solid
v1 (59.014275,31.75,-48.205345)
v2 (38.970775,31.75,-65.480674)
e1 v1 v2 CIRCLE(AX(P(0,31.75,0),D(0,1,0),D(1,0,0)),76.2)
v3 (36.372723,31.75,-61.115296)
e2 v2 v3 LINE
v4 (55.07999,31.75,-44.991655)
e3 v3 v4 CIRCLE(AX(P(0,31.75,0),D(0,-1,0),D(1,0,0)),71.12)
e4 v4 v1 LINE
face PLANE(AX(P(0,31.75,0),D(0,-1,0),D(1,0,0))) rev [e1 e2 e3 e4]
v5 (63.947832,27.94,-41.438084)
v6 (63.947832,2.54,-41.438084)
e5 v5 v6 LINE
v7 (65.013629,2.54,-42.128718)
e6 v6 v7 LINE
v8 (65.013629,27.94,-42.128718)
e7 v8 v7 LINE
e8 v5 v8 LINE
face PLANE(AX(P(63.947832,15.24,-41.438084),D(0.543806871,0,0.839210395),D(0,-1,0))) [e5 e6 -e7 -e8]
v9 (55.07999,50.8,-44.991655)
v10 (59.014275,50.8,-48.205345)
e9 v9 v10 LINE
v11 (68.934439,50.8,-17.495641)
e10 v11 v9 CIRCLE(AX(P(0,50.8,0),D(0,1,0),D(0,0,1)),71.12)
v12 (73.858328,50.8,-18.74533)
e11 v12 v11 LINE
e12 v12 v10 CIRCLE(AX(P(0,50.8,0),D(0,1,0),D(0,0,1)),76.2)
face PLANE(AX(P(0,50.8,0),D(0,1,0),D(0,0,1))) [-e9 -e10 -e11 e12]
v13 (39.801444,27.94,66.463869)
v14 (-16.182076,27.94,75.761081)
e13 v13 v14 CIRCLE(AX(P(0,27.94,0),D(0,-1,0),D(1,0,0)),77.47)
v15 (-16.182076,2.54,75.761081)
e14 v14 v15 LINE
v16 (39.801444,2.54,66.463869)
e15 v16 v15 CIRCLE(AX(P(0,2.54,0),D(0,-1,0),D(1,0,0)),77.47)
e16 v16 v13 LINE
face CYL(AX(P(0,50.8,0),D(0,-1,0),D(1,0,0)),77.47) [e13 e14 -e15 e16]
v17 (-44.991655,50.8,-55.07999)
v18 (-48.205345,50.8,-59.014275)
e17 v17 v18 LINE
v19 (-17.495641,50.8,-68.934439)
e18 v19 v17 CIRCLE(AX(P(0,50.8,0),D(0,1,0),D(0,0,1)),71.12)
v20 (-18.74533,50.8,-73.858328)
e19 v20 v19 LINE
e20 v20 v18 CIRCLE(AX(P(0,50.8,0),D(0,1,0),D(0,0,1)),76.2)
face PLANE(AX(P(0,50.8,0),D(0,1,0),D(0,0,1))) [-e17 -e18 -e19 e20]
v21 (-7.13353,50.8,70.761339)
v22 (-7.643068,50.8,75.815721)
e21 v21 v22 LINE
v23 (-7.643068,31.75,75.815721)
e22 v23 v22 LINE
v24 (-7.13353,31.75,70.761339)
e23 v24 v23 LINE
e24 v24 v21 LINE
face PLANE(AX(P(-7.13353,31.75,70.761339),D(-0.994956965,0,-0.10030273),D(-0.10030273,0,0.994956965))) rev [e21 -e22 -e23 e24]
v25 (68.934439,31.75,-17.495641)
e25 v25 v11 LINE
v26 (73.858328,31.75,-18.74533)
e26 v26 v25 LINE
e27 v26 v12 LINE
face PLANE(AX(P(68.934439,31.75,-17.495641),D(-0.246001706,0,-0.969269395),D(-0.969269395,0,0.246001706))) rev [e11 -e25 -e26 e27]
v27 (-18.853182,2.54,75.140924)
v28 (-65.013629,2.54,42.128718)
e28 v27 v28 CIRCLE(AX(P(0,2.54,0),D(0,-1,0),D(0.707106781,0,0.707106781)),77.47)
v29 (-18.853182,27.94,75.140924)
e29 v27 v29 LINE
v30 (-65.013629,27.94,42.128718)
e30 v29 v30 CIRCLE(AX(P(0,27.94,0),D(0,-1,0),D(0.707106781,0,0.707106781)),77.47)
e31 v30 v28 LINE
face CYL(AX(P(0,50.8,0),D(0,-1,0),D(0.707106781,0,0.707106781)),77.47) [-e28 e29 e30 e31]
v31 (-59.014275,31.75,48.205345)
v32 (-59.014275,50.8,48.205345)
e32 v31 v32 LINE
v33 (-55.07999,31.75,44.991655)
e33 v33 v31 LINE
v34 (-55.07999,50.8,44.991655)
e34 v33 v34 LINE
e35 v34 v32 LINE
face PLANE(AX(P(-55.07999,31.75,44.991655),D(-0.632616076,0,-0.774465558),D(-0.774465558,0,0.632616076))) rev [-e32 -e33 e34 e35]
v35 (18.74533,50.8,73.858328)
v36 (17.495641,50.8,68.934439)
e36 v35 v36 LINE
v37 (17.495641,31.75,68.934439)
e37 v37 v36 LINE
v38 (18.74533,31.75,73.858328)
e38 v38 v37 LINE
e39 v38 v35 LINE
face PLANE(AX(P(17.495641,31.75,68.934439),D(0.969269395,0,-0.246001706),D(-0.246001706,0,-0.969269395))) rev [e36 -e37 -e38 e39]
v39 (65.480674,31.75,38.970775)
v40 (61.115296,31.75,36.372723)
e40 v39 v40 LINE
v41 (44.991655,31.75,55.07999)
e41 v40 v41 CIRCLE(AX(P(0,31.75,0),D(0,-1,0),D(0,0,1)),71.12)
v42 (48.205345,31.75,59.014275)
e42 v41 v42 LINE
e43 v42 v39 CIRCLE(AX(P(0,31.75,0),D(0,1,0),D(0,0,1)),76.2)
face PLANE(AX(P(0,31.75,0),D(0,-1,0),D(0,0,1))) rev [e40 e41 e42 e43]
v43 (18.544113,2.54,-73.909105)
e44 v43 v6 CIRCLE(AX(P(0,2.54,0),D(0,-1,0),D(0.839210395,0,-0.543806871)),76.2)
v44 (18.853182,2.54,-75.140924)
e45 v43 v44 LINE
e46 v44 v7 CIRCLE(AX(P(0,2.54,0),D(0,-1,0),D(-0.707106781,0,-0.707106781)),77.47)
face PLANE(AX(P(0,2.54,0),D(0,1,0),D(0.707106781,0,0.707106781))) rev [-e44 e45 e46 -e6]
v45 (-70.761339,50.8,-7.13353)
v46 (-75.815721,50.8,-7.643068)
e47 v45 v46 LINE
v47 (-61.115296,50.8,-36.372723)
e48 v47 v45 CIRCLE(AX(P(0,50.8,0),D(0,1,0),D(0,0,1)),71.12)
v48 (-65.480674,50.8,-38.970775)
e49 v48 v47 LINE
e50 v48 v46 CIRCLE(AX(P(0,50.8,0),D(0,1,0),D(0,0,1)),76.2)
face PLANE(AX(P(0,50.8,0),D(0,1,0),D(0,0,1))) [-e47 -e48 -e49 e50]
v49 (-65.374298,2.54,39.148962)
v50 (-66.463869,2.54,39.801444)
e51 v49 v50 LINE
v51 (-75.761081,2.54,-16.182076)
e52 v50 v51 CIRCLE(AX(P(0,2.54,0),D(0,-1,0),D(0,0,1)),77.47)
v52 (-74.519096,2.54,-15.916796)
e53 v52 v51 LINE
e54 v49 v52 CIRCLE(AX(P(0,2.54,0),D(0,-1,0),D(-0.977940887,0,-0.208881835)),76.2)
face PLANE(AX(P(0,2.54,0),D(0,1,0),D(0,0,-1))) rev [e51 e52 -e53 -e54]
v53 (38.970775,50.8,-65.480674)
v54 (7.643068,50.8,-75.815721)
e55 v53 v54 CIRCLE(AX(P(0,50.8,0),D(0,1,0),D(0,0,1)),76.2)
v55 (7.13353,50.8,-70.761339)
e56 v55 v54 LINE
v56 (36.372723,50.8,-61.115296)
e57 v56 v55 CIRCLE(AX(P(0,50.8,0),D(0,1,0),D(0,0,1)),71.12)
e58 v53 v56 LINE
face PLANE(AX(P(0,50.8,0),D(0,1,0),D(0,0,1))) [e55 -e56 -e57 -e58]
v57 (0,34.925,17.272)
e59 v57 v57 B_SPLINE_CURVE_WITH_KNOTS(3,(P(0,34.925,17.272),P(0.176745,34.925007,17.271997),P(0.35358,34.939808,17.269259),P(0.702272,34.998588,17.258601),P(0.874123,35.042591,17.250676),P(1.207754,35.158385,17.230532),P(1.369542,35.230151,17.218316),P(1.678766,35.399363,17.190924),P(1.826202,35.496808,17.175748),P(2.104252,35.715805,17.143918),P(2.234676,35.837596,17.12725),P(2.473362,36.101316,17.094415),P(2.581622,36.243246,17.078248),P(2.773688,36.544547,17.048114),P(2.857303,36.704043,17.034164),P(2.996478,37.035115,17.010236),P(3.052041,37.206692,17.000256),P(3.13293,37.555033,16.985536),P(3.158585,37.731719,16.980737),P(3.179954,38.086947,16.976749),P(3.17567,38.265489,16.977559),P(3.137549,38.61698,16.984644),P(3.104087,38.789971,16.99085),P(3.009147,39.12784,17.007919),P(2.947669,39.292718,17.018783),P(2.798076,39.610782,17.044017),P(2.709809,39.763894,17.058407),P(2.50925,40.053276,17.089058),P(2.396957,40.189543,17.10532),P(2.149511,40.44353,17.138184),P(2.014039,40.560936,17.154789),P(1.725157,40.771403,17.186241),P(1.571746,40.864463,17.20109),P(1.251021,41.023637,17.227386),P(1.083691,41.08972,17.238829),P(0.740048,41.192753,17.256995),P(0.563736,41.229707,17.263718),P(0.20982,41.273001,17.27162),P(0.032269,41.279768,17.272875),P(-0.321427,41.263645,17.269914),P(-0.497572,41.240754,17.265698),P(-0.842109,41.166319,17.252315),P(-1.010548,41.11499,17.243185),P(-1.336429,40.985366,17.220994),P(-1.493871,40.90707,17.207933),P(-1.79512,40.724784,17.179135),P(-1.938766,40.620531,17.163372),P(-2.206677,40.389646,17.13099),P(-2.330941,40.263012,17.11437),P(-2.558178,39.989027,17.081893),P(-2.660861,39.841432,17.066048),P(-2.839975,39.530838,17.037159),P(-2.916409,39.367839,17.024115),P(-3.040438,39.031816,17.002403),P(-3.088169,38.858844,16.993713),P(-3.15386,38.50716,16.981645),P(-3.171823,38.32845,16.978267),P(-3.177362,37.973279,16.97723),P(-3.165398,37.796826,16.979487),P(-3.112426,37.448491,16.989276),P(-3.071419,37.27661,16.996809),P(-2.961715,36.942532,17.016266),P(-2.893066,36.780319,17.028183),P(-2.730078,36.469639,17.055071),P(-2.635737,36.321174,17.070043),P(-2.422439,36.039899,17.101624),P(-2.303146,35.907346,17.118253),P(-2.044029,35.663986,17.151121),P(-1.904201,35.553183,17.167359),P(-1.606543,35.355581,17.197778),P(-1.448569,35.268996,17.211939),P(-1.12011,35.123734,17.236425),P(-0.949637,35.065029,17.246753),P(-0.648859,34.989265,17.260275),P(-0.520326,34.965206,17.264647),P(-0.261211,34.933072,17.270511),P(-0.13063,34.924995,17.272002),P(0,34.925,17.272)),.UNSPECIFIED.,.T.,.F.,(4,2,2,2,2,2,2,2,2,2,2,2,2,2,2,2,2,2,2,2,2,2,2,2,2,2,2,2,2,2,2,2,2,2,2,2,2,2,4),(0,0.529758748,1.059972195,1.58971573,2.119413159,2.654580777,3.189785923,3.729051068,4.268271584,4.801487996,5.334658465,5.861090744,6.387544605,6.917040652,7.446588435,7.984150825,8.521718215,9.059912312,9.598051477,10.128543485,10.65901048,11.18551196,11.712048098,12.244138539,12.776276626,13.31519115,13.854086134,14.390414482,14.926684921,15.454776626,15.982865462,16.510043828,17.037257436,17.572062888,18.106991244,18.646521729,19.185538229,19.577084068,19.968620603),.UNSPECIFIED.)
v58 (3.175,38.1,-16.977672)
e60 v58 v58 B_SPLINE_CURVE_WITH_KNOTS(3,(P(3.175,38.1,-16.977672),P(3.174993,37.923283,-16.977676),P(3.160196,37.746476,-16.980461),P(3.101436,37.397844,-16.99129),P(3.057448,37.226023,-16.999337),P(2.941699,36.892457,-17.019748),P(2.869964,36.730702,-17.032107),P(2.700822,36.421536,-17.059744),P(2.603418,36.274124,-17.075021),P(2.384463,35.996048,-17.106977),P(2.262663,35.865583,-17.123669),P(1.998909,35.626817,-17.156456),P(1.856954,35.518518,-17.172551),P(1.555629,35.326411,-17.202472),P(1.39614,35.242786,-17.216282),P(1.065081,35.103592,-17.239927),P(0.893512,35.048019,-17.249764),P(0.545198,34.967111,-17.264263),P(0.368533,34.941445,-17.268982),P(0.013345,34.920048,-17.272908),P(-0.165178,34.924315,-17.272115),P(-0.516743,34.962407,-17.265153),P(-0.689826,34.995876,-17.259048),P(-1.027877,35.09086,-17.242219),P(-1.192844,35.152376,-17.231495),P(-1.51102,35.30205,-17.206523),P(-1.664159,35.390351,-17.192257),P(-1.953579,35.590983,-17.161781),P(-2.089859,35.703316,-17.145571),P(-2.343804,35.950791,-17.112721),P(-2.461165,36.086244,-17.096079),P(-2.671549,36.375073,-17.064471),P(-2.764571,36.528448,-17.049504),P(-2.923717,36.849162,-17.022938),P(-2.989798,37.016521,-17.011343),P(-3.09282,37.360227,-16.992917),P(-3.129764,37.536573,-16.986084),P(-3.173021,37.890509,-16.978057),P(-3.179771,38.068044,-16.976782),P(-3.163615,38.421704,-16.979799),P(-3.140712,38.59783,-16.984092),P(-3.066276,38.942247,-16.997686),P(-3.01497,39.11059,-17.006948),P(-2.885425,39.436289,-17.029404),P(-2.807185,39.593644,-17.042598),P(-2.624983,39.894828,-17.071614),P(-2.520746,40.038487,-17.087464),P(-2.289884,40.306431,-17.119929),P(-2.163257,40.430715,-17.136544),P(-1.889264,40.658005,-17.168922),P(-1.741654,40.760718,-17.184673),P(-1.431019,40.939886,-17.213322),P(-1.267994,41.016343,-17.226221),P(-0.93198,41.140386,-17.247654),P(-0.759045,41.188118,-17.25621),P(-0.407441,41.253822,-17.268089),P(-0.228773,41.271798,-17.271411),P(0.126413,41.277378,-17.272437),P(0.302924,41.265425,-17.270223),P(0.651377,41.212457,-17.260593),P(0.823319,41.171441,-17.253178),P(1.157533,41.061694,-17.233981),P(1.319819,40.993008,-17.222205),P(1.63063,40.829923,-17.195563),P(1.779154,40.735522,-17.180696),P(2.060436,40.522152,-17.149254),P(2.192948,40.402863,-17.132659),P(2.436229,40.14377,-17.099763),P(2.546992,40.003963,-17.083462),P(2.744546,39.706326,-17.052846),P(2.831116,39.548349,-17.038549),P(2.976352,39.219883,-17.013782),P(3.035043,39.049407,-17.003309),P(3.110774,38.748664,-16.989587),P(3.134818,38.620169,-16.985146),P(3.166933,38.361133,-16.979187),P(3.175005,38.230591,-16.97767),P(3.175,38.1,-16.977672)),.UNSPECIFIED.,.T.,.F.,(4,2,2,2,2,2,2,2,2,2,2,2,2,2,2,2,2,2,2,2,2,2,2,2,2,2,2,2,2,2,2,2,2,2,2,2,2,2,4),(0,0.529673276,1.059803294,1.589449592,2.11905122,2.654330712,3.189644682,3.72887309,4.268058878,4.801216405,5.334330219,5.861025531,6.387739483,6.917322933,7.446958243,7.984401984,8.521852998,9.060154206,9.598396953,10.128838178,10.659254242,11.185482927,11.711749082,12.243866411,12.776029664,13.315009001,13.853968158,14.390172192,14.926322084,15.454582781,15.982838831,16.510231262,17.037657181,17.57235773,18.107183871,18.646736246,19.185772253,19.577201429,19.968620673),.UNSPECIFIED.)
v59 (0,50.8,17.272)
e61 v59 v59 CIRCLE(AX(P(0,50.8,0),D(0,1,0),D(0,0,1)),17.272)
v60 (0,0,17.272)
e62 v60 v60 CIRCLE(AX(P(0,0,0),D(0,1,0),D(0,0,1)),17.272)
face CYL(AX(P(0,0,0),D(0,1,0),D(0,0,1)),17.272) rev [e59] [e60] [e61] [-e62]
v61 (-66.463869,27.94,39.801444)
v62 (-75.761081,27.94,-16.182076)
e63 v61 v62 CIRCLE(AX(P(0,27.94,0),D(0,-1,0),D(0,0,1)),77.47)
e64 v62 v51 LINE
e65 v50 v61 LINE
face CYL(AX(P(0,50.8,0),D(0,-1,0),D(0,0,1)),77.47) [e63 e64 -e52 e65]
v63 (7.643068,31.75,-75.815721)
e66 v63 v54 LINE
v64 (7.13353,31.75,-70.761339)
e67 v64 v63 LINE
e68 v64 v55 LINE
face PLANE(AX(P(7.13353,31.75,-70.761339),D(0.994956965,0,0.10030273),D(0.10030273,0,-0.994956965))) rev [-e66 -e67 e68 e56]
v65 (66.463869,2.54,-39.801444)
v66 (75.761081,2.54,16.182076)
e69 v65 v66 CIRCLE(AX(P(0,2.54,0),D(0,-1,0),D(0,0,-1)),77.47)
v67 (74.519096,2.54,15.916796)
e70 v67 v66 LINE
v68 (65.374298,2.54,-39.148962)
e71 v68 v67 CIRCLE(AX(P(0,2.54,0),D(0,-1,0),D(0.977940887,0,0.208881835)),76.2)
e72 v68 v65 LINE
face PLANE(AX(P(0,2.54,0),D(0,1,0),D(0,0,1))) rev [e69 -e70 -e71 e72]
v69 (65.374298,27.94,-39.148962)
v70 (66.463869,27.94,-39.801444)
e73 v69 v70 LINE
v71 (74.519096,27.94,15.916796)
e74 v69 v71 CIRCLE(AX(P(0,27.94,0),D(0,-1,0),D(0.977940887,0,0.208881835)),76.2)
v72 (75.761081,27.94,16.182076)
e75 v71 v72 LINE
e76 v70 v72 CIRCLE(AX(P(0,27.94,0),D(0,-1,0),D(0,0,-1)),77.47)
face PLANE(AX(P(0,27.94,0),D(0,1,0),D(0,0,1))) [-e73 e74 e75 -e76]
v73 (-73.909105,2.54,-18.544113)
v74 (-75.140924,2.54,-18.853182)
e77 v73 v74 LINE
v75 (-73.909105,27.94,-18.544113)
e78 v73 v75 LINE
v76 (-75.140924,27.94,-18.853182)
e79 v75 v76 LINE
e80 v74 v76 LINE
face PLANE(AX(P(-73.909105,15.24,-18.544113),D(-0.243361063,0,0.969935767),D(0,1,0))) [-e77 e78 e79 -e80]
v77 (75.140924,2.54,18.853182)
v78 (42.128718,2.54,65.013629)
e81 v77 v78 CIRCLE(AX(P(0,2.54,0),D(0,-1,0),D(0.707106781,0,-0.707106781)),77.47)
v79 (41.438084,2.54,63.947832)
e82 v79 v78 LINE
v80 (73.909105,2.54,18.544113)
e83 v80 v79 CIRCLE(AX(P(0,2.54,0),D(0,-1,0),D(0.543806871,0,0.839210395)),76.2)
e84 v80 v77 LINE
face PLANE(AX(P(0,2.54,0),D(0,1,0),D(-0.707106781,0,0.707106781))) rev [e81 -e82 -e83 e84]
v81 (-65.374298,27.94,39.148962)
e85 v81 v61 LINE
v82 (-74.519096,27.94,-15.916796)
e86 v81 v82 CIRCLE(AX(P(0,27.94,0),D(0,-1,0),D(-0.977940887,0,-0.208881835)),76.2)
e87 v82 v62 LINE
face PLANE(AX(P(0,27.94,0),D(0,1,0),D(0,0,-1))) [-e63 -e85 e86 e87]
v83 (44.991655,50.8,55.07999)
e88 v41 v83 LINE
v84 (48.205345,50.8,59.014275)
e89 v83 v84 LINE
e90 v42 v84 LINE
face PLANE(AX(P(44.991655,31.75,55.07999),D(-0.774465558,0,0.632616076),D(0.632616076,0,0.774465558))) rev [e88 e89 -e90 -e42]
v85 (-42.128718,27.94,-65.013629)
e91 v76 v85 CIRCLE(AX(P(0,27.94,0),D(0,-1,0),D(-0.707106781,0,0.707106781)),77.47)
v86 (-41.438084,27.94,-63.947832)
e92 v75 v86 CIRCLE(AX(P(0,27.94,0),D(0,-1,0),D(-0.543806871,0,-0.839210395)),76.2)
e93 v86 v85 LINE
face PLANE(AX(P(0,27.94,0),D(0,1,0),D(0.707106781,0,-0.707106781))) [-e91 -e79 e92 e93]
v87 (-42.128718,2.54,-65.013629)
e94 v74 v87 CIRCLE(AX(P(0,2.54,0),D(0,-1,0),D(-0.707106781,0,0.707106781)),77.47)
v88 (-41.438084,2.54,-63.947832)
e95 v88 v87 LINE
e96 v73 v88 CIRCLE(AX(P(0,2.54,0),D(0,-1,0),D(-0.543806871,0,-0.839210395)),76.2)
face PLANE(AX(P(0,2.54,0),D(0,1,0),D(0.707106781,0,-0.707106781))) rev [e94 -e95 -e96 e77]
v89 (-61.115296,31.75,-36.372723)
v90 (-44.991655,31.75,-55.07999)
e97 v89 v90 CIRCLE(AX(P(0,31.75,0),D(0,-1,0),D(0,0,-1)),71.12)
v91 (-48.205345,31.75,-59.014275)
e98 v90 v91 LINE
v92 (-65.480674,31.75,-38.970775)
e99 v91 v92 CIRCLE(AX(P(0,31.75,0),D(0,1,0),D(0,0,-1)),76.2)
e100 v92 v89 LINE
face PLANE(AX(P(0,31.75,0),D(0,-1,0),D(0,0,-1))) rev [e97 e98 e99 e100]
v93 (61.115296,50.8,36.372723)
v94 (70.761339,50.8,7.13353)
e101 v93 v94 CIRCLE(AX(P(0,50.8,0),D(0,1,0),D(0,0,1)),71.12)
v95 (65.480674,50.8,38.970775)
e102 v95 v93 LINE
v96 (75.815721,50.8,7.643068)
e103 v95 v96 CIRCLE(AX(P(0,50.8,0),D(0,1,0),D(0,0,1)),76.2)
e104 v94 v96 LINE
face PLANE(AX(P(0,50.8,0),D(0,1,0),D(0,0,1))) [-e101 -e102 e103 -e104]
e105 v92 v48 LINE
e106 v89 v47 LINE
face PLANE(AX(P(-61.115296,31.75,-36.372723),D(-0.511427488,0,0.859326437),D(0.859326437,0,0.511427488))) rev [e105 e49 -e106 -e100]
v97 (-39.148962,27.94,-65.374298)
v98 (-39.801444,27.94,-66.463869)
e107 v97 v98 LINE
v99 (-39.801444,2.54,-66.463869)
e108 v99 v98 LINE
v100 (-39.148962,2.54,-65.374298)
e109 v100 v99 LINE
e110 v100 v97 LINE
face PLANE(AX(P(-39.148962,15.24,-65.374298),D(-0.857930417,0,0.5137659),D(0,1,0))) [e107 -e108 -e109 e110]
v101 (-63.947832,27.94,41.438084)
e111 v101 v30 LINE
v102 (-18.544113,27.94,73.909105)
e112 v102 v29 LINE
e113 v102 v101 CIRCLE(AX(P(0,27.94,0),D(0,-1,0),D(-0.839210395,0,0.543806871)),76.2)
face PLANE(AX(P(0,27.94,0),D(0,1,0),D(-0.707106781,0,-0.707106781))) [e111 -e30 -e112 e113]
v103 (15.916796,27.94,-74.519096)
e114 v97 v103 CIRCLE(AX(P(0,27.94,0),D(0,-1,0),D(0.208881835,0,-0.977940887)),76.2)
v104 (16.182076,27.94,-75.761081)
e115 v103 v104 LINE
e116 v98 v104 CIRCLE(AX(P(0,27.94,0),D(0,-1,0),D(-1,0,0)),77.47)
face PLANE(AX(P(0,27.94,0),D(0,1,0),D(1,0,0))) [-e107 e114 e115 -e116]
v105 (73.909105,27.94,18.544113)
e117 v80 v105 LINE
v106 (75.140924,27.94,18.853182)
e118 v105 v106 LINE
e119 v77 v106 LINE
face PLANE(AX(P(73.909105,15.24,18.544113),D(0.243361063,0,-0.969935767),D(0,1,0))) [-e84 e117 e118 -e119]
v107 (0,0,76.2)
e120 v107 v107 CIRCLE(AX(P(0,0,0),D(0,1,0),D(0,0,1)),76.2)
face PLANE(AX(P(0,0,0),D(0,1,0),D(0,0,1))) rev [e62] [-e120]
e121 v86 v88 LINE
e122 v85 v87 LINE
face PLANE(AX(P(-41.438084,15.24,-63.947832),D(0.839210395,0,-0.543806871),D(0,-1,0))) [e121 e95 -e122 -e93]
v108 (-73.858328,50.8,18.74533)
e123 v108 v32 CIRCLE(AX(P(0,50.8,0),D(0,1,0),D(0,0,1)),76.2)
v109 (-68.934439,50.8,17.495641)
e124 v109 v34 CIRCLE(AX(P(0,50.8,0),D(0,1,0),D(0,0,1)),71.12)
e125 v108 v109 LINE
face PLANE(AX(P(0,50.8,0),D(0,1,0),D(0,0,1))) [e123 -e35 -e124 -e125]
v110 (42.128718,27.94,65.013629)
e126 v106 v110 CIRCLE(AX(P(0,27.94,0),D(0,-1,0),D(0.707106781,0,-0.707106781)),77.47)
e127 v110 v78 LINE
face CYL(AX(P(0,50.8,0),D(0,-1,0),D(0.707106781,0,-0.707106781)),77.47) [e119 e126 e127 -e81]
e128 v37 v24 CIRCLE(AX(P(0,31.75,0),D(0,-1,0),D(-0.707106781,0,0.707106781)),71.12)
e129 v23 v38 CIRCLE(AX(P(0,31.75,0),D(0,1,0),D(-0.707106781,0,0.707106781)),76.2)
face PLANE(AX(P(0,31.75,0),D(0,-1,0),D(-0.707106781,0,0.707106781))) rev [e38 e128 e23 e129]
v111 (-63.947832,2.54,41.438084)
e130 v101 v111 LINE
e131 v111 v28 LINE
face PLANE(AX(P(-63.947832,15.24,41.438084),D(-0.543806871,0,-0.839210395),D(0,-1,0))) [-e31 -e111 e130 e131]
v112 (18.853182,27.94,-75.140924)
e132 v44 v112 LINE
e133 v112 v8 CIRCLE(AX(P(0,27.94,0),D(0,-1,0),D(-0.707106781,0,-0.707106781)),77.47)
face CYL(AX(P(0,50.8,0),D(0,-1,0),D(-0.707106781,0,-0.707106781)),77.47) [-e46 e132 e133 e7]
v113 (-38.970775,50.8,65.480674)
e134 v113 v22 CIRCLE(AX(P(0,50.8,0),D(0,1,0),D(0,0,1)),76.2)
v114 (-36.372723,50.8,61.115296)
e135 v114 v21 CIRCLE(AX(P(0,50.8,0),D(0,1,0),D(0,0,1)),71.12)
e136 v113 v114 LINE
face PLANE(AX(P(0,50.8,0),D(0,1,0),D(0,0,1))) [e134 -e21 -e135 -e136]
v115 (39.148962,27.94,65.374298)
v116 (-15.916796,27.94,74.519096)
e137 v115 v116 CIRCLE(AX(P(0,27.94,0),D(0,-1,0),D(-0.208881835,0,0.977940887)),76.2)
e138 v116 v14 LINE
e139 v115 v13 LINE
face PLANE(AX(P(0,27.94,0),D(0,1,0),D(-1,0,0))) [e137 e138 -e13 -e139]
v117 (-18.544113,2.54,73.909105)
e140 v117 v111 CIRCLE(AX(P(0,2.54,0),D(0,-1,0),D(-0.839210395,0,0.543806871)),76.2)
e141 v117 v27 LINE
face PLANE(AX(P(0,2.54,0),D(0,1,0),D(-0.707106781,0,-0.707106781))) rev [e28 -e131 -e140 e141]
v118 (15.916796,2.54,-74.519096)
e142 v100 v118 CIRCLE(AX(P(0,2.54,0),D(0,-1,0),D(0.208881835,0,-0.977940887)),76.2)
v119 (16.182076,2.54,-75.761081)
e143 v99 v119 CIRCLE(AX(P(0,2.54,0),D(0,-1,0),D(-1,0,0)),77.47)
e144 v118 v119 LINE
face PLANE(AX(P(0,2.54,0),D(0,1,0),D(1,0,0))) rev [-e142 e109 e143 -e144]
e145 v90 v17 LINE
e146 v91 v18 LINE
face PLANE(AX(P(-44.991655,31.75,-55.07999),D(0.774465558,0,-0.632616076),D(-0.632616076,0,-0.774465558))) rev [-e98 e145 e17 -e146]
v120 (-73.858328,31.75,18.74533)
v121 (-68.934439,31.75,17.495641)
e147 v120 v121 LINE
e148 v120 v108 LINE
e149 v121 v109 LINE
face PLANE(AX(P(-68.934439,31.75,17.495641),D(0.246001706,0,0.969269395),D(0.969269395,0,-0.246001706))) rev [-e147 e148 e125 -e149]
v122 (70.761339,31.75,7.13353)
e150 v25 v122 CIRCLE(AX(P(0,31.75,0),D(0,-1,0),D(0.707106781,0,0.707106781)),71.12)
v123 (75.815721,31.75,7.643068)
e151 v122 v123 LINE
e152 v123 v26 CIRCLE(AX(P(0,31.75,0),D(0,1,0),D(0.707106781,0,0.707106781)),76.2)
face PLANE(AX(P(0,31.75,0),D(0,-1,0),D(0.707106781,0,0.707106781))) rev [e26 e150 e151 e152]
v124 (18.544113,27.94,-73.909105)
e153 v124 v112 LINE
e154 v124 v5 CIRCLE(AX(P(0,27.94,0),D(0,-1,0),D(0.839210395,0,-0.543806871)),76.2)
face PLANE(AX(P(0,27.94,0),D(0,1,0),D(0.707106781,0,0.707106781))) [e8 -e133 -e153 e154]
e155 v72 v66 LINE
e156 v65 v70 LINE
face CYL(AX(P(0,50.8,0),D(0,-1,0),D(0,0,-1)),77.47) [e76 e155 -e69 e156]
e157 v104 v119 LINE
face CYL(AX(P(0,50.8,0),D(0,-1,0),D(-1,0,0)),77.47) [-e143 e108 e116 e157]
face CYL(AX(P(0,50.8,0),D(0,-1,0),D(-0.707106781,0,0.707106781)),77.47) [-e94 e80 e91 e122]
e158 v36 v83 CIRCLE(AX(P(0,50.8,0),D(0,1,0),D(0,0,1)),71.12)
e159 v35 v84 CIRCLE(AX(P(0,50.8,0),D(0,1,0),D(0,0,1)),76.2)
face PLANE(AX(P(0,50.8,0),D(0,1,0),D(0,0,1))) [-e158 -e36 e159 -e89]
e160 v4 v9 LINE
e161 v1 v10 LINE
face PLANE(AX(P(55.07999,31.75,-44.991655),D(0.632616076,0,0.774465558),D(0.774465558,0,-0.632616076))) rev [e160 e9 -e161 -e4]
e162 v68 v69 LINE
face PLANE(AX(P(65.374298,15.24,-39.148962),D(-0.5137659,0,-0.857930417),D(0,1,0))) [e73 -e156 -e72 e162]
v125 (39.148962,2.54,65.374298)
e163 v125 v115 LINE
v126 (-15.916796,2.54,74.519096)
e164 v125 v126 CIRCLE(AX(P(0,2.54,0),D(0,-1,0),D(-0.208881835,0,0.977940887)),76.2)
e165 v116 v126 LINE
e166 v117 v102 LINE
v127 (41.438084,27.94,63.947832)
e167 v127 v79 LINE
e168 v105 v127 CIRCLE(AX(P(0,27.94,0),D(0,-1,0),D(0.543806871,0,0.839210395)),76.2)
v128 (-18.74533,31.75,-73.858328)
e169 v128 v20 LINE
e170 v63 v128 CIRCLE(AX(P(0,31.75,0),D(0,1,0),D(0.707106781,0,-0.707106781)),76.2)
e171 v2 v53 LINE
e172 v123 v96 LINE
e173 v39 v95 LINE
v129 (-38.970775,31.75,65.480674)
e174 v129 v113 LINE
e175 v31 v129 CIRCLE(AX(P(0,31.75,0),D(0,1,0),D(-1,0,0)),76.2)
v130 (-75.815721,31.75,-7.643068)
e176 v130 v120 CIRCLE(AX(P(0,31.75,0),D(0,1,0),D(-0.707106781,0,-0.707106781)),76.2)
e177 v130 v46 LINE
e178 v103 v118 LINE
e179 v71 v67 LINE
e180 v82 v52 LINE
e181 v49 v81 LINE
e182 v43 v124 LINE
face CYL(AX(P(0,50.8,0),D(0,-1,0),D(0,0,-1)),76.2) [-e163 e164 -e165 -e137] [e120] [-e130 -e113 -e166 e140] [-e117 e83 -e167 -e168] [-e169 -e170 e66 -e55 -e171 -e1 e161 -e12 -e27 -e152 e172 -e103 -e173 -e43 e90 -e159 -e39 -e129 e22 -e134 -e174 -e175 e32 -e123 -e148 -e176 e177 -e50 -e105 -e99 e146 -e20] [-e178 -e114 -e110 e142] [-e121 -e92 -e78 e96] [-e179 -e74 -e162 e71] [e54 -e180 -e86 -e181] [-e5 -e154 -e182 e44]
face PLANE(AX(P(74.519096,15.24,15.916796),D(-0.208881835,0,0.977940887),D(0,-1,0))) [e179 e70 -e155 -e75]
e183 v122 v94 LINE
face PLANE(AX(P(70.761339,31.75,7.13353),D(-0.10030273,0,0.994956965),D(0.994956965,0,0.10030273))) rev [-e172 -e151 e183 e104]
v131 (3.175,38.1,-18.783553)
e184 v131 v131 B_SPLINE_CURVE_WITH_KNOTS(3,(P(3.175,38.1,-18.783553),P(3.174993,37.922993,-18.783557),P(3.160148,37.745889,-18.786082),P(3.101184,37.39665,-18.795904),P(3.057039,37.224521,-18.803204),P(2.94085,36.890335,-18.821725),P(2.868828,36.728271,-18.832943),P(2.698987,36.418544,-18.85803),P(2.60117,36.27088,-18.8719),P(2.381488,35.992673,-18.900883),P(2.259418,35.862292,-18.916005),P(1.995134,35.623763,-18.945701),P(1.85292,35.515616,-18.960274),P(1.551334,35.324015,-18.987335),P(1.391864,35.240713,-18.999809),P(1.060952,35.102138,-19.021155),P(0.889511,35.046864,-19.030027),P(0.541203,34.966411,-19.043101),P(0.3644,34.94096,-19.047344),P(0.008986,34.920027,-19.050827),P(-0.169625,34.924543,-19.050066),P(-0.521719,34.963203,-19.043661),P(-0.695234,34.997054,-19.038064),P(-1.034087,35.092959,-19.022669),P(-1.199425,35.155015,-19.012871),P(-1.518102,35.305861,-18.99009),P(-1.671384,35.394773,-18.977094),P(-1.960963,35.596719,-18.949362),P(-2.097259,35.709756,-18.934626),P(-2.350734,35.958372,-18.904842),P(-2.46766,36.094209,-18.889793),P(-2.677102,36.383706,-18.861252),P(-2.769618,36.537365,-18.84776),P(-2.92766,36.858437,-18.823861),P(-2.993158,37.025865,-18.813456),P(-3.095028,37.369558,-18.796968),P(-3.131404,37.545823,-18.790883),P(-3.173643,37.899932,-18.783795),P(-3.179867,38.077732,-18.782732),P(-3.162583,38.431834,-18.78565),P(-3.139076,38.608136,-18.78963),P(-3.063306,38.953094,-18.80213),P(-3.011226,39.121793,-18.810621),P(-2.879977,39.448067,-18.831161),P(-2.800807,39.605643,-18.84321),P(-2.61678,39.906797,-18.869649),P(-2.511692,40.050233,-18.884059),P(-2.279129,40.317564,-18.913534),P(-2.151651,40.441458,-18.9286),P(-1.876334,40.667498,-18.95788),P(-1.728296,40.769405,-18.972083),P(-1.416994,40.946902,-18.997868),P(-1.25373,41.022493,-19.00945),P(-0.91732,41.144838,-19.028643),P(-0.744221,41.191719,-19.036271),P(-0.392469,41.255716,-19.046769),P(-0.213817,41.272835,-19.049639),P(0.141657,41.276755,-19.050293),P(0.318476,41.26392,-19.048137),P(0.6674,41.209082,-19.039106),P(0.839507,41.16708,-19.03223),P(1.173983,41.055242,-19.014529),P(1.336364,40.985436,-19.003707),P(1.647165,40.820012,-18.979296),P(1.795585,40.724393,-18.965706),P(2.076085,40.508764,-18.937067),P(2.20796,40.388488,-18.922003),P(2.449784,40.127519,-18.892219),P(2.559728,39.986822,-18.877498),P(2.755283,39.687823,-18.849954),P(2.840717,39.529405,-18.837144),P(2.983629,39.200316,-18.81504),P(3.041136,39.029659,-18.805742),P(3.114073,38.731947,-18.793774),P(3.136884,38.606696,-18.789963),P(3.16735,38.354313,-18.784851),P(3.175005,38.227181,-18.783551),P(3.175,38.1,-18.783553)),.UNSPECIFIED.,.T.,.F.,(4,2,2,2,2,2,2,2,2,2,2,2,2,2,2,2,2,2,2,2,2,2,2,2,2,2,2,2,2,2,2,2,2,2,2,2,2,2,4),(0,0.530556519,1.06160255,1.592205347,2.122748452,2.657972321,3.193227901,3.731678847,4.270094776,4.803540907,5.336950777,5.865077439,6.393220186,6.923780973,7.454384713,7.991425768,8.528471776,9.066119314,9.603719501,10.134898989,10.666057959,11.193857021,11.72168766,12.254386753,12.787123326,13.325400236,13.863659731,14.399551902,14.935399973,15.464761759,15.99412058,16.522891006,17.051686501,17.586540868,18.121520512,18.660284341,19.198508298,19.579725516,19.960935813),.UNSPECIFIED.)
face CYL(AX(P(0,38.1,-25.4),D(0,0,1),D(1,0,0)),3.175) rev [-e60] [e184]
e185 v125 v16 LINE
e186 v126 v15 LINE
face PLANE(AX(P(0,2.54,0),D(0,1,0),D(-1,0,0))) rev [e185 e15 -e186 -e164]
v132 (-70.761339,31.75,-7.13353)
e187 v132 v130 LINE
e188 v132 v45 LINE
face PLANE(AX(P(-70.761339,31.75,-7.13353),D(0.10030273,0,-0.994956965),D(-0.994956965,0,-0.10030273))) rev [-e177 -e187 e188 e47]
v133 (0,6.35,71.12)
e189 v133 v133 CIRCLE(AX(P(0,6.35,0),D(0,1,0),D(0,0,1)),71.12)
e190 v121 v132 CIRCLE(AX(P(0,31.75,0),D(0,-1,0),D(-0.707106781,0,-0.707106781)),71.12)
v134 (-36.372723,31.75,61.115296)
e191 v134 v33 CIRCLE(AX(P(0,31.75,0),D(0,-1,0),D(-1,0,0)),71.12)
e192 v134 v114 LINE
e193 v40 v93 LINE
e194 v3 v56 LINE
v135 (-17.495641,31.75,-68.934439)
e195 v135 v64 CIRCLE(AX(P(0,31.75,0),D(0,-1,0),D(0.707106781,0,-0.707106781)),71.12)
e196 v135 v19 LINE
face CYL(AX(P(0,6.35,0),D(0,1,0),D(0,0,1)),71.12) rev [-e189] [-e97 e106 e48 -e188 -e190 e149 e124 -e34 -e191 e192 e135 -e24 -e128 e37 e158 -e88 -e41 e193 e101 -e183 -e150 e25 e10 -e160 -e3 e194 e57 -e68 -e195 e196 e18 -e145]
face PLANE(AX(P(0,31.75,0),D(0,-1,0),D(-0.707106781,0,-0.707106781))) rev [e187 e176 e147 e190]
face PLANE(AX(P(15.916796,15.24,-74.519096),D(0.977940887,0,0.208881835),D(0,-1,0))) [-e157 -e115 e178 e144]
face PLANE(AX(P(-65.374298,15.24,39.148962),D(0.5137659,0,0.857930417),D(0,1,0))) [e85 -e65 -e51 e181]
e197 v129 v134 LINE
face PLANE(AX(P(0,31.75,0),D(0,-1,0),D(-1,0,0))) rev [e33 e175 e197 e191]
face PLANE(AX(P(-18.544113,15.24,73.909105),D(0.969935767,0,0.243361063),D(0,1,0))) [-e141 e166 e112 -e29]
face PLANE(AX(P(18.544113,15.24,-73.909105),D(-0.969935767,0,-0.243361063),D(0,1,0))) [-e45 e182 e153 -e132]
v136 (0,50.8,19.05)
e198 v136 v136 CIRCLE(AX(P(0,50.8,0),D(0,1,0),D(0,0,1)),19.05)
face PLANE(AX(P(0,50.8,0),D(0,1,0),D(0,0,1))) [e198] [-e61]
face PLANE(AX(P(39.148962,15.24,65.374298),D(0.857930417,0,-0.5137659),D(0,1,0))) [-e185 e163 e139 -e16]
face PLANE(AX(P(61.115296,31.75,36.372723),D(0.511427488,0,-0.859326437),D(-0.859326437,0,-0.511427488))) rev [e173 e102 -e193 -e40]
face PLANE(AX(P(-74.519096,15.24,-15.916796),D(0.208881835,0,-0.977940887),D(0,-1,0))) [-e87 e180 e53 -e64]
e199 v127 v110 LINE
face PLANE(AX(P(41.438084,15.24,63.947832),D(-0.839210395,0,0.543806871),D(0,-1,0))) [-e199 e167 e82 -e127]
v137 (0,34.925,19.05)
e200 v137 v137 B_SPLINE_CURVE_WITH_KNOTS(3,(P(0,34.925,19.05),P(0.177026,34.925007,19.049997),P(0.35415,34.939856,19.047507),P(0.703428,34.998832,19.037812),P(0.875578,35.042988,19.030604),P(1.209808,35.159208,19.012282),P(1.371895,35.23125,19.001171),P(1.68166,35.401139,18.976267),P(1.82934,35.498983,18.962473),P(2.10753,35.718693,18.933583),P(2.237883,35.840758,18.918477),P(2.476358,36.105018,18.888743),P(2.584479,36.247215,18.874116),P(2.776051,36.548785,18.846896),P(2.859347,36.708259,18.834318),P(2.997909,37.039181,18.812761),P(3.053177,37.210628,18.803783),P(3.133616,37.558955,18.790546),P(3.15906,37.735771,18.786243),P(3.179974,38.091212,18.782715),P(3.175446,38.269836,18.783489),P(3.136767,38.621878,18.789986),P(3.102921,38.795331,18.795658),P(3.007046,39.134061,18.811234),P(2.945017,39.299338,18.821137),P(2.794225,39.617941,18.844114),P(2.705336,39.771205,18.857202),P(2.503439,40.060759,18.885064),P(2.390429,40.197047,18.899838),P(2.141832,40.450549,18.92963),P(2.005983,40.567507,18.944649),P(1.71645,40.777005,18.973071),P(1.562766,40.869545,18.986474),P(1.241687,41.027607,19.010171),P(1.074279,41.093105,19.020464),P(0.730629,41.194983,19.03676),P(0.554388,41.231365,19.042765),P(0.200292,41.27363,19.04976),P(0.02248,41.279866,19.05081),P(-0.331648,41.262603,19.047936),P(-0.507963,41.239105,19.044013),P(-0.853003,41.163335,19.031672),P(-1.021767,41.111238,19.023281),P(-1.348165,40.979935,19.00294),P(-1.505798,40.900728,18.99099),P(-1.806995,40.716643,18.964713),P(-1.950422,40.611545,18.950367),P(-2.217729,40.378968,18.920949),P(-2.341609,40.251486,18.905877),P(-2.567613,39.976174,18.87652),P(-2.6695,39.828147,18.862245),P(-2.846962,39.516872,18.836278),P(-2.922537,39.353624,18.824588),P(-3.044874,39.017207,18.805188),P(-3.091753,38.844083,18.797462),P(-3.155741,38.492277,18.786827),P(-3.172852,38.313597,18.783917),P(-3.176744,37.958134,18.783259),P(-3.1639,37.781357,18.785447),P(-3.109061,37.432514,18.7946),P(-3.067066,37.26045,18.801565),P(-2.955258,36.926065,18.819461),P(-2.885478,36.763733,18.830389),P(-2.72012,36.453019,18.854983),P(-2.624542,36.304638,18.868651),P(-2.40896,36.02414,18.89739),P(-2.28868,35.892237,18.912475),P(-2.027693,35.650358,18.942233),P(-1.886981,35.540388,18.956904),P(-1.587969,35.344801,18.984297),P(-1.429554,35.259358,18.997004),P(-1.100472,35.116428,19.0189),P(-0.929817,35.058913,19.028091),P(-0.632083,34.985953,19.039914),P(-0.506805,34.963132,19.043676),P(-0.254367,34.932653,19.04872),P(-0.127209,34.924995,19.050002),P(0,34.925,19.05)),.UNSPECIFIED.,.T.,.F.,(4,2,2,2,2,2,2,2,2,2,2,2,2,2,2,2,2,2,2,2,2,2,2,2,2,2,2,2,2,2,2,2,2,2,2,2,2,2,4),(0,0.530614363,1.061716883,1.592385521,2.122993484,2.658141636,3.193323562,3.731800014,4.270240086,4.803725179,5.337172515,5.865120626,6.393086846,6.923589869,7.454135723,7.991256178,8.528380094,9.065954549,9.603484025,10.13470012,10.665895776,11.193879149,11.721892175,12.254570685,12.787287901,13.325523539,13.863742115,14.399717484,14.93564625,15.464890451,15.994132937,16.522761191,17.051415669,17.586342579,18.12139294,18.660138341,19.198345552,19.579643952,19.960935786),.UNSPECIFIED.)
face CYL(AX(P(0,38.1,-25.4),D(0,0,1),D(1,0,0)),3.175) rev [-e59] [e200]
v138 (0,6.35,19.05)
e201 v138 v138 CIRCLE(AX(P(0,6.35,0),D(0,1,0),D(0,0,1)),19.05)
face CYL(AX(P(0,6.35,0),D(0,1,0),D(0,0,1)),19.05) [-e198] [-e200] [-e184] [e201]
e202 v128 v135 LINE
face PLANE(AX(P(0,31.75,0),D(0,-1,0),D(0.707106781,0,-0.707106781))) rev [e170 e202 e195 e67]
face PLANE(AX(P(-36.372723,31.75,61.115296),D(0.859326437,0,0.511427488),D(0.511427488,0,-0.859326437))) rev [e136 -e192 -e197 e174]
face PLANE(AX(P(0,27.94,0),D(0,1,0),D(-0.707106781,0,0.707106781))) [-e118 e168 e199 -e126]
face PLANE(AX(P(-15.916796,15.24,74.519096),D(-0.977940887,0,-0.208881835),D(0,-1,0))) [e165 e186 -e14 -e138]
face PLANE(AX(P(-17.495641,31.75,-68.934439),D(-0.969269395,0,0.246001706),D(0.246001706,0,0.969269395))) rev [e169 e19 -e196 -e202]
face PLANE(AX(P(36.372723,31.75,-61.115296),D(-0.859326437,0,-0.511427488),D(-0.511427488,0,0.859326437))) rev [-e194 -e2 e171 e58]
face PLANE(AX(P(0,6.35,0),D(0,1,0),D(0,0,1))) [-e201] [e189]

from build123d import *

# Parameters (mm, degrees)
SKETCH2_R           = 76.2
BOSS_EXTRUDE1_DEPTH = 50.8
SKETCH3_R           = 71.12
SKETCH3_R_2         = 19.05
CUT_EXTRUDE1_DEPTH  = 44.45
SKETCH4_R           = 17.272
CUT_EXTRUDE2_DEPTH  = 120.1365603
CUT_EXTRUDE3_DEPTH  = 19.05
CIRPATTERN1_COUNT   = 8
SKETCH6_R           = 3.175
CUT_EXTRUDE4_DEPTH  = 25.4
WRAP1_START         = 2.54
WRAP1_DEPTH         = 25.4
CIRPATTERN2_COUNT   = 8


# Read off the part's stored shape, not the designer's step: Wrap1
with BuildPart() as part:
    # Sketch2 → Boss-Extrude1 (new body)
    with BuildSketch(Plane(origin=(0, 0, 0), x_dir=(1, 0, 0), z_dir=(0, 1, 0))):
        with Locations(Location((0, 0, 0), (0, 0, 270))):
            Circle(SKETCH2_R)
    extrude(amount=BOSS_EXTRUDE1_DEPTH)

    # Sketch3 → Cut-Extrude1 (cut)
    with BuildSketch(Plane(origin=(0, 50.8, 0), x_dir=(1, 0, 0), z_dir=(0, 1, 0))):
        with Locations(Location((0, 0, 0), (0, 0, 270))):
            Circle(SKETCH3_R)
        with Locations(Location((0, 0, 0), (0, 0, 270))):
            Circle(SKETCH3_R_2, mode=Mode.SUBTRACT)
    extrude(amount=-CUT_EXTRUDE1_DEPTH, mode=Mode.SUBTRACT)

    # Sketch4 → Cut-Extrude2 (cut, through all)
    with BuildSketch(Plane(origin=(0, 50.8, 0), x_dir=(1, 0, 0), z_dir=(0, 1, 0))):
        with Locations(Location((0, 0, 0), (0, 0, 270))):
            Circle(SKETCH4_R)
    extrude(amount=-CUT_EXTRUDE2_DEPTH, mode=Mode.SUBTRACT)

    # Sketch5 → Cut-Extrude3 (cut)
    with BuildSketch(Plane(origin=(0, 50.8, 0), x_dir=(1, 0, 0), z_dir=(0, 1, 0))):
        with BuildLine():
            Line((-44.991655358, 55.079990451), (-48.205345027, 59.014275484))
            ThreePointArc((-48.205345027, 59.014275484), (-57.719695429, 49.748133227), (-65.480674483, 38.970774553))
            Line((-65.480674483, 38.970774553), (-61.115296184, 36.372722916))
            ThreePointArc((-61.115296184, 36.372722916), (-53.871715734, 46.431591012), (-44.991655358, 55.079990451))
        make_face()
    cut_extrude3 = extrude(amount=-CUT_EXTRUDE3_DEPTH, mode=Mode.SUBTRACT)

    # CirPattern1: Cut-Extrude3 ×8 about axis
    cirpattern1_axis = Axis((0, 0, 0), (0, 1, 0))
    for i in range(1, CIRPATTERN1_COUNT):
        add(cut_extrude3.rotate(cirpattern1_axis, i * 360 / CIRPATTERN1_COUNT), mode=Mode.SUBTRACT)

    # Sketch6 → Cut-Extrude4 (cut, symmetric)
    with BuildSketch(Plane.XY):
        with Locations((0, 38.1)):
            Circle(SKETCH6_R)
    extrude(amount=CUT_EXTRUDE4_DEPTH, both=True, mode=Mode.SUBTRACT)

    # Wrap1 outline → Wrap1 (add)
    with BuildSketch(Plane(origin=(0, 0, 0), x_dir=(1, 0, 0), z_dir=(0, 1, 0)).offset(WRAP1_START)):
        with BuildLine():
            ThreePointArc((75.761080539, -16.182075751), (76.423312697, 12.691657751), (66.463869373, 39.801444294))
            Line((66.463869373, 39.801444294), (65.374297744, 39.148961601))
            ThreePointArc((65.374297744, 39.148961601), (75.170471505, 12.483597787), (74.519095612, -15.916795821))
            Line((74.519095612, -15.916795821), (75.761080539, -16.182075751))
        make_face()
    wrap1 = extrude(amount=WRAP1_DEPTH)

    # CirPattern2: Wrap1 ×8 about axis
    cirpattern2_axis = Axis((0, 0, 0), (0, 1, 0))
    for i in range(1, CIRPATTERN2_COUNT):
        add(wrap1.rotate(cirpattern2_axis, i * 360 / CIRPATTERN2_COUNT))


solid = part.part
